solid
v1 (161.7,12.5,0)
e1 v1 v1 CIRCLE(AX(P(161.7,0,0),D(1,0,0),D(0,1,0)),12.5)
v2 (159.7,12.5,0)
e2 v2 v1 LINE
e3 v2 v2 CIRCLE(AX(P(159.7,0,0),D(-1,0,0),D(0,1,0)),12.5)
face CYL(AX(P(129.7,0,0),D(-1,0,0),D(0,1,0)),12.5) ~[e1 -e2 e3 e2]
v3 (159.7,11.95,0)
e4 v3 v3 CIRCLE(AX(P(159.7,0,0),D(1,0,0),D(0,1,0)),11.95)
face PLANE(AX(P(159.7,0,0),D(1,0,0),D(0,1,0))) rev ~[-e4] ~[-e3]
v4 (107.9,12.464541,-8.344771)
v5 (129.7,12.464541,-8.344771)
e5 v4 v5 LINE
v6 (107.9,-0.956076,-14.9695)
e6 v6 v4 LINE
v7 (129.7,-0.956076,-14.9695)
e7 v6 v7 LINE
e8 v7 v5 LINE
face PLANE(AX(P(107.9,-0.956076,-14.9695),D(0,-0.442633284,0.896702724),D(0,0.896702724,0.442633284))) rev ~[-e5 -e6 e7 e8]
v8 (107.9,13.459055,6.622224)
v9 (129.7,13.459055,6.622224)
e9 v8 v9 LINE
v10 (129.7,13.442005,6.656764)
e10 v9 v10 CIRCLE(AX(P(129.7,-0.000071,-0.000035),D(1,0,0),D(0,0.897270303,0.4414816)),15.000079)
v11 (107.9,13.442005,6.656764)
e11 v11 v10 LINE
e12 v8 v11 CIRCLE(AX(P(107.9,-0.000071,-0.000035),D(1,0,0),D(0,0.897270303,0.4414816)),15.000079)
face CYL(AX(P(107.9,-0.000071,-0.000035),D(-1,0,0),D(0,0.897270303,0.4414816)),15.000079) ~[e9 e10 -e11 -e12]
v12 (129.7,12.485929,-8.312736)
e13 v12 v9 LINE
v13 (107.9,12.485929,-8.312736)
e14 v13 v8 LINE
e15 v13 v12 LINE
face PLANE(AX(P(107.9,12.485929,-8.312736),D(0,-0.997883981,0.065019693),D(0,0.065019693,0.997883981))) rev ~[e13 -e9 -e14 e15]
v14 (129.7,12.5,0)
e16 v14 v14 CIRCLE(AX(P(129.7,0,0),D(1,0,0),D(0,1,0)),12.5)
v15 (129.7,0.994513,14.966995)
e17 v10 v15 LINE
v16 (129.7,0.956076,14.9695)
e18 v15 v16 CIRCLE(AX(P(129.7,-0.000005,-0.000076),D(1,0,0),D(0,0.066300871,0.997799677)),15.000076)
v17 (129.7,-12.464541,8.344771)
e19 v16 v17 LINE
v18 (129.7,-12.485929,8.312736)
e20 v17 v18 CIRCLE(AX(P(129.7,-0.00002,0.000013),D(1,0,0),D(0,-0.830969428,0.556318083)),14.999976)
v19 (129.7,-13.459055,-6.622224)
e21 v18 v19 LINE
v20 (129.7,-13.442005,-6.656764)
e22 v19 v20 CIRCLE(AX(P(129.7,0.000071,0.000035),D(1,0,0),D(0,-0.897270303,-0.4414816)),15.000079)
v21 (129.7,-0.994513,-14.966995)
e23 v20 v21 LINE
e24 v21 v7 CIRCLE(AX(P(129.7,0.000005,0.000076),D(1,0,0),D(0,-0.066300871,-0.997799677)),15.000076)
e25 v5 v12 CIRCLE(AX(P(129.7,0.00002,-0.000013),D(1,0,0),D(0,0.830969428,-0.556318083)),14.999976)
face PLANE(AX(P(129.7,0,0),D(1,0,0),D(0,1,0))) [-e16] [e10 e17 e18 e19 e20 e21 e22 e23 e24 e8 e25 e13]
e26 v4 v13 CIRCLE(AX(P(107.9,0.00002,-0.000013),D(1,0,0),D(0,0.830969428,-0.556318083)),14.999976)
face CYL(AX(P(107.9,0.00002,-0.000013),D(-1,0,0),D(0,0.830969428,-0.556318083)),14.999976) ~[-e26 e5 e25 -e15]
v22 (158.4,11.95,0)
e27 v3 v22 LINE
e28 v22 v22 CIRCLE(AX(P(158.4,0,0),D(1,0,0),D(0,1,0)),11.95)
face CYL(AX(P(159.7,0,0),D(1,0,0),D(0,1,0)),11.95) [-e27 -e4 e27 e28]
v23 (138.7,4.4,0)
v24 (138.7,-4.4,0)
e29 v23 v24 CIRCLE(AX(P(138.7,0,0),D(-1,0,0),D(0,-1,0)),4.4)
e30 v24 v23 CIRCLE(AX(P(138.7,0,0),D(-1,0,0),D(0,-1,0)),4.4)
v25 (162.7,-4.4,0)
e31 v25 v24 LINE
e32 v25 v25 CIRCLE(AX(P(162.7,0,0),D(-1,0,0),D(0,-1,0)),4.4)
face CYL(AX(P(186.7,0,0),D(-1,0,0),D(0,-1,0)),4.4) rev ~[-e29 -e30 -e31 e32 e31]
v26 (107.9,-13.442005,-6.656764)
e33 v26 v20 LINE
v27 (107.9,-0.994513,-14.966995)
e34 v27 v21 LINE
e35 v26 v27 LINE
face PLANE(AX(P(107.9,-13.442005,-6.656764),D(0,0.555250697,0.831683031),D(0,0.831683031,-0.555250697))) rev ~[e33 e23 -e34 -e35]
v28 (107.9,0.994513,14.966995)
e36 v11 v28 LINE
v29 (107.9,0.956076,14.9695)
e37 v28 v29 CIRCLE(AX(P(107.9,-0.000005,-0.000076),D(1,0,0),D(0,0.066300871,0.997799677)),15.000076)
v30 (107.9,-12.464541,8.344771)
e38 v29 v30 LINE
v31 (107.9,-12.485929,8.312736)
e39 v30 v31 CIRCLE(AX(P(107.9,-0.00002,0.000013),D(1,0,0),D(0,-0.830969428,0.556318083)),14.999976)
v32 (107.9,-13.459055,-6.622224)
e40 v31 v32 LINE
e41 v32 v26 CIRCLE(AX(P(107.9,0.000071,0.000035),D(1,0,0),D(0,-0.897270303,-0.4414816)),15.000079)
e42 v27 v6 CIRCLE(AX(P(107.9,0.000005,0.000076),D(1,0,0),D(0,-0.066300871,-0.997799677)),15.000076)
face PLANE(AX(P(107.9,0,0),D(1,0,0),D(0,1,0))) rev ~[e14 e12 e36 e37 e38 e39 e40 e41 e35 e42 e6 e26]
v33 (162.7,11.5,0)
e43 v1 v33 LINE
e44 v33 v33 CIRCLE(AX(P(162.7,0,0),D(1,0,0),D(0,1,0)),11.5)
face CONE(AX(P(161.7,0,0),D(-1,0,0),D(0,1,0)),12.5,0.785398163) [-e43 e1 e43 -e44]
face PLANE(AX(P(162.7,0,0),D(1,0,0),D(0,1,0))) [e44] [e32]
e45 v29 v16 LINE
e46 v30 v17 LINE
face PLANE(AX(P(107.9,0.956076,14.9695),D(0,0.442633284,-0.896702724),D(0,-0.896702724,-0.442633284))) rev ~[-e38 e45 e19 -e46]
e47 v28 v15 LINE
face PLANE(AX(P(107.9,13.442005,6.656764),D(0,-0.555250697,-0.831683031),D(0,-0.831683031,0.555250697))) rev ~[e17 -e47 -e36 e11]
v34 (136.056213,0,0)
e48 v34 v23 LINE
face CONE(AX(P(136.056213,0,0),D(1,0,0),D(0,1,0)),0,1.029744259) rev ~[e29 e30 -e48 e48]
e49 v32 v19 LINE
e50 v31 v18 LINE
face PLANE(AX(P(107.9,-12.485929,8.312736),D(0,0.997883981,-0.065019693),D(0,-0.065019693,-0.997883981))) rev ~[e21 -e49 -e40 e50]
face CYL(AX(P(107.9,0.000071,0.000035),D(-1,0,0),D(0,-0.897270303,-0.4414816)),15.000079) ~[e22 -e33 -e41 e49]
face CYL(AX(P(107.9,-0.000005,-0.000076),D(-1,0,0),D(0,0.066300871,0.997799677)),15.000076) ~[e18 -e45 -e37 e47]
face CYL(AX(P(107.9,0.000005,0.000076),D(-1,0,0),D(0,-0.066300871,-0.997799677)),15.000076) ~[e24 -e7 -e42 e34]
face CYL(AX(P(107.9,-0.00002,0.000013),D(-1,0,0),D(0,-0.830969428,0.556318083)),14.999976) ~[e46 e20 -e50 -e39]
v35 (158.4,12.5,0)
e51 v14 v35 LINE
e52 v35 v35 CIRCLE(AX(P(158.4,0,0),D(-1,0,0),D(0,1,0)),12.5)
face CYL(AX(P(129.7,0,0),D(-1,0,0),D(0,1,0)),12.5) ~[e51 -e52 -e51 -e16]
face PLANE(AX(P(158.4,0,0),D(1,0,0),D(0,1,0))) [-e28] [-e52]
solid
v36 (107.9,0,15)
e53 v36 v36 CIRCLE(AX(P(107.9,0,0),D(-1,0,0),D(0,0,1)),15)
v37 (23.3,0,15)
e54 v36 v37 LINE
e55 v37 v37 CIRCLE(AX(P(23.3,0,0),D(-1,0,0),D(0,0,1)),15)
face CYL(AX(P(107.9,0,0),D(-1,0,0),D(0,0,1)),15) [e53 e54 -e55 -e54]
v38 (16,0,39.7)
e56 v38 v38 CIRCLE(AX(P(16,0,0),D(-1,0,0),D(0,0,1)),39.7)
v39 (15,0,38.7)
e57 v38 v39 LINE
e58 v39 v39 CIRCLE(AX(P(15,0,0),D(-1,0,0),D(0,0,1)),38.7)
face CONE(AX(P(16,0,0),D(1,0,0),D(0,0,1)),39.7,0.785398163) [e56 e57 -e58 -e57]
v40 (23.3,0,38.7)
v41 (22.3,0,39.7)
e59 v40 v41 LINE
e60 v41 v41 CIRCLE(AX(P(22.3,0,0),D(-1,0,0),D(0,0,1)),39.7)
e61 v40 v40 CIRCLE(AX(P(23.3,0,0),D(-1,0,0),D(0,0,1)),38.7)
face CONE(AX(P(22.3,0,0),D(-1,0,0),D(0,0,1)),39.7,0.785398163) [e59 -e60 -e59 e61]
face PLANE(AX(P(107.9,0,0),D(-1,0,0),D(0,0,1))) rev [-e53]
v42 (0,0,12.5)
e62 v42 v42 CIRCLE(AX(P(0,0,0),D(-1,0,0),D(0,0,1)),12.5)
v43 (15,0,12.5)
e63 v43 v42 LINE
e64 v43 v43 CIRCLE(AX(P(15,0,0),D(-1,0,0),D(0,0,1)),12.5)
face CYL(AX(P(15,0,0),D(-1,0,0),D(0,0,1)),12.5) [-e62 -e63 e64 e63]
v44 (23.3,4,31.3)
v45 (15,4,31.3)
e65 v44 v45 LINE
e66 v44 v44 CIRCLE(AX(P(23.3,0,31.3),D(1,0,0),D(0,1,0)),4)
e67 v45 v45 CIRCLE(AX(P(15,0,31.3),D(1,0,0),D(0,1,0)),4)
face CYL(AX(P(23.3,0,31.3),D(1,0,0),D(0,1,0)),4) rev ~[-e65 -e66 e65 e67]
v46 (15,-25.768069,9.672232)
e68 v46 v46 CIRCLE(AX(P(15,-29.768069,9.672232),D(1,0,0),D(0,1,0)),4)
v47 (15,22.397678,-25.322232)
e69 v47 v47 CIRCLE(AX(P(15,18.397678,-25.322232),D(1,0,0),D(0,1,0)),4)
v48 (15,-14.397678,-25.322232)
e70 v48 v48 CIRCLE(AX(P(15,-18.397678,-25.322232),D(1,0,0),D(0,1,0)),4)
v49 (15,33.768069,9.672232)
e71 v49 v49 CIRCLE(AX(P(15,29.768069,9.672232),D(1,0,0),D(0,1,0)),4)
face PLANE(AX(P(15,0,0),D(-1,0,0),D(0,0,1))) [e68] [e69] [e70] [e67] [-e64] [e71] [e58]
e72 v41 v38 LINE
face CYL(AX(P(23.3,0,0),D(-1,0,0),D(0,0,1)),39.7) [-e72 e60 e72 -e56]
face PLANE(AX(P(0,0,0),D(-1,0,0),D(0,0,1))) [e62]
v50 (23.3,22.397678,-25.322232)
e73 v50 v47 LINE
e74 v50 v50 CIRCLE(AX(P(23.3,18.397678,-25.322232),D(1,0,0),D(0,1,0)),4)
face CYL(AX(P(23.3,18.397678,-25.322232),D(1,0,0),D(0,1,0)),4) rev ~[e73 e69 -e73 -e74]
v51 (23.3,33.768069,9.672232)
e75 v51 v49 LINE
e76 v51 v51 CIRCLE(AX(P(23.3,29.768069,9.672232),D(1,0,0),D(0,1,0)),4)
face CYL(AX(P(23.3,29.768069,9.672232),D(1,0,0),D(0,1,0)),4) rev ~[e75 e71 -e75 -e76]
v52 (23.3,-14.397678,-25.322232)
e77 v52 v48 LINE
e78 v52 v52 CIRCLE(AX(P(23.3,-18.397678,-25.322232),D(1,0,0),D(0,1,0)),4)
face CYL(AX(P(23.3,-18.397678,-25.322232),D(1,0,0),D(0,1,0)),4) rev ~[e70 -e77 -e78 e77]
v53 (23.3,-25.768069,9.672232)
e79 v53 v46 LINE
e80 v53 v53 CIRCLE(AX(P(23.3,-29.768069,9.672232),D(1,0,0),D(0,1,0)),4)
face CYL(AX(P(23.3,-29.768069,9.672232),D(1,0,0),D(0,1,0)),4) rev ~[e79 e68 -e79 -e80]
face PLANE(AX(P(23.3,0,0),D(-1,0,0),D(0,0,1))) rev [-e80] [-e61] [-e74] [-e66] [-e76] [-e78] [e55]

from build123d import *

# Parameters (mm, degrees)
F3_DEPTH  = 21.8
F4_R      = 12.5
F5_DEPTH  = 33
F6_SIZE   = 1
F6_2_SIZE = 1
F8_R      = 15
F8_R_2    = 11.95
F9_DEPTH  = 1.3
F10_R     = 4
F11_DEPTH = 8.3
F13_D     = 8.8
F13_DEPTH = 24
F13_TIP   = 2.6437867237


# Not quite as in the source:
# - two fillets or chamfers of one size are made in one step


with BuildPart() as f1:
    # F0 (on Front) → F1 (revolve)
    with BuildSketch(Plane.XZ):
        Polygon((0, 12.5), (0, 0), (107.9, 0), (107.9, 15), (23.3, 15), (23.3, 39.7), (15, 39.7), (15, 12.5), align=None)
    revolve(axis=Axis((53.95, 0, 0), (-1, 0, 0)))

    # F6#2
    f6_2_edges = [f1.edges().sort_by_distance(p)[0] for p in [
        (23.3, 0, -39.7),
        (15, 0, -39.7),
    ]]
    chamfer(f6_2_edges, length=F6_2_SIZE)

    # F10 (on face) → F11 (cut, through all)
    with BuildSketch(Plane.YZ.offset(23.3)):
        with Locations((0, 31.3)):
            Circle(F10_R)
        with Locations((29.76806896, 9.6722319239)):
            Circle(F10_R)
        with Locations((18.3976783968, -25.3222319239)):
            Circle(F10_R)
        with Locations((-18.3976783968, -25.3222319239)):
            Circle(F10_R)
        with Locations((-29.76806896, 9.6722319239)):
            Circle(F10_R)
    extrude(amount=-F11_DEPTH, mode=Mode.SUBTRACT)


with BuildPart() as f3:
    # F2 (on face) → F3 (new body)
    with BuildSketch(Plane.YZ.offset(107.9)):
        with BuildLine():
            Line((-0.9560760495, -14.9694996105), (12.4645414386, -8.3447712207))
            ThreePointArc((12.4645414386, -8.3447712207), (12.4752454622, -8.3287604515), (12.4859289198, -8.3127359521))
            Line((12.4859289198, -8.3127359521), (13.4590545852, 6.622223922))
            ThreePointArc((13.4590545852, 6.622223922), (13.4505408641, 6.6394992629), (13.4420049694, 6.6567636584))
            Line((13.4420049694, 6.6567636584), (0.9945131466, 14.9669951427))
            ThreePointArc((0.9945131466, 14.9669951427), (0.975295402, 14.9682597144), (0.9560760495, 14.9694996105))
            Line((0.9560760495, 14.9694996105), (-12.4645414386, 8.3447712207))
            ThreePointArc((-12.4645414386, 8.3447712207), (-12.4752454622, 8.3287604515), (-12.4859289198, 8.3127359521))
            Line((-12.4859289198, 8.3127359521), (-13.4590545852, -6.622223922))
            ThreePointArc((-13.4590545852, -6.622223922), (-13.4505408641, -6.6394992629), (-13.4420049694, -6.6567636584))
            Line((-13.4420049694, -6.6567636584), (-0.9945131466, -14.9669951427))
            ThreePointArc((-0.9945131466, -14.9669951427), (-0.975295402, -14.9682597144), (-0.9560760495, -14.9694996105))
        make_face()
    extrude(amount=F3_DEPTH)

    # F4 (on face) → F5 (join)
    with BuildSketch(Plane.YZ.offset(129.7)):
        Circle(F4_R)
    extrude(amount=F5_DEPTH)

    # F6
    f6_edges = [f3.edges().sort_by_distance(p)[0] for p in [
        (162.7, -12.5, 0),
    ]]
    chamfer(f6_edges, length=F6_SIZE)

    # F8 (on offset) → F9 (cut)
    with BuildSketch(Plane.YZ.offset(159.7)):
        Circle(F8_R)
        Circle(F8_R_2, mode=Mode.SUBTRACT)
    extrude(amount=-F9_DEPTH, mode=Mode.SUBTRACT)

    # F13
    with Locations(Plane.YZ.offset(162.7)):
        with Locations((0, 0)):
            Hole(F13_D / 2, depth=F13_DEPTH)
            with Locations((0, 0, -(F13_DEPTH + F13_TIP / 2))):  # 118° drill point
                Cone(0, F13_D / 2, F13_TIP, mode=Mode.SUBTRACT)


solid = Compound([f1.part, f3.part])
